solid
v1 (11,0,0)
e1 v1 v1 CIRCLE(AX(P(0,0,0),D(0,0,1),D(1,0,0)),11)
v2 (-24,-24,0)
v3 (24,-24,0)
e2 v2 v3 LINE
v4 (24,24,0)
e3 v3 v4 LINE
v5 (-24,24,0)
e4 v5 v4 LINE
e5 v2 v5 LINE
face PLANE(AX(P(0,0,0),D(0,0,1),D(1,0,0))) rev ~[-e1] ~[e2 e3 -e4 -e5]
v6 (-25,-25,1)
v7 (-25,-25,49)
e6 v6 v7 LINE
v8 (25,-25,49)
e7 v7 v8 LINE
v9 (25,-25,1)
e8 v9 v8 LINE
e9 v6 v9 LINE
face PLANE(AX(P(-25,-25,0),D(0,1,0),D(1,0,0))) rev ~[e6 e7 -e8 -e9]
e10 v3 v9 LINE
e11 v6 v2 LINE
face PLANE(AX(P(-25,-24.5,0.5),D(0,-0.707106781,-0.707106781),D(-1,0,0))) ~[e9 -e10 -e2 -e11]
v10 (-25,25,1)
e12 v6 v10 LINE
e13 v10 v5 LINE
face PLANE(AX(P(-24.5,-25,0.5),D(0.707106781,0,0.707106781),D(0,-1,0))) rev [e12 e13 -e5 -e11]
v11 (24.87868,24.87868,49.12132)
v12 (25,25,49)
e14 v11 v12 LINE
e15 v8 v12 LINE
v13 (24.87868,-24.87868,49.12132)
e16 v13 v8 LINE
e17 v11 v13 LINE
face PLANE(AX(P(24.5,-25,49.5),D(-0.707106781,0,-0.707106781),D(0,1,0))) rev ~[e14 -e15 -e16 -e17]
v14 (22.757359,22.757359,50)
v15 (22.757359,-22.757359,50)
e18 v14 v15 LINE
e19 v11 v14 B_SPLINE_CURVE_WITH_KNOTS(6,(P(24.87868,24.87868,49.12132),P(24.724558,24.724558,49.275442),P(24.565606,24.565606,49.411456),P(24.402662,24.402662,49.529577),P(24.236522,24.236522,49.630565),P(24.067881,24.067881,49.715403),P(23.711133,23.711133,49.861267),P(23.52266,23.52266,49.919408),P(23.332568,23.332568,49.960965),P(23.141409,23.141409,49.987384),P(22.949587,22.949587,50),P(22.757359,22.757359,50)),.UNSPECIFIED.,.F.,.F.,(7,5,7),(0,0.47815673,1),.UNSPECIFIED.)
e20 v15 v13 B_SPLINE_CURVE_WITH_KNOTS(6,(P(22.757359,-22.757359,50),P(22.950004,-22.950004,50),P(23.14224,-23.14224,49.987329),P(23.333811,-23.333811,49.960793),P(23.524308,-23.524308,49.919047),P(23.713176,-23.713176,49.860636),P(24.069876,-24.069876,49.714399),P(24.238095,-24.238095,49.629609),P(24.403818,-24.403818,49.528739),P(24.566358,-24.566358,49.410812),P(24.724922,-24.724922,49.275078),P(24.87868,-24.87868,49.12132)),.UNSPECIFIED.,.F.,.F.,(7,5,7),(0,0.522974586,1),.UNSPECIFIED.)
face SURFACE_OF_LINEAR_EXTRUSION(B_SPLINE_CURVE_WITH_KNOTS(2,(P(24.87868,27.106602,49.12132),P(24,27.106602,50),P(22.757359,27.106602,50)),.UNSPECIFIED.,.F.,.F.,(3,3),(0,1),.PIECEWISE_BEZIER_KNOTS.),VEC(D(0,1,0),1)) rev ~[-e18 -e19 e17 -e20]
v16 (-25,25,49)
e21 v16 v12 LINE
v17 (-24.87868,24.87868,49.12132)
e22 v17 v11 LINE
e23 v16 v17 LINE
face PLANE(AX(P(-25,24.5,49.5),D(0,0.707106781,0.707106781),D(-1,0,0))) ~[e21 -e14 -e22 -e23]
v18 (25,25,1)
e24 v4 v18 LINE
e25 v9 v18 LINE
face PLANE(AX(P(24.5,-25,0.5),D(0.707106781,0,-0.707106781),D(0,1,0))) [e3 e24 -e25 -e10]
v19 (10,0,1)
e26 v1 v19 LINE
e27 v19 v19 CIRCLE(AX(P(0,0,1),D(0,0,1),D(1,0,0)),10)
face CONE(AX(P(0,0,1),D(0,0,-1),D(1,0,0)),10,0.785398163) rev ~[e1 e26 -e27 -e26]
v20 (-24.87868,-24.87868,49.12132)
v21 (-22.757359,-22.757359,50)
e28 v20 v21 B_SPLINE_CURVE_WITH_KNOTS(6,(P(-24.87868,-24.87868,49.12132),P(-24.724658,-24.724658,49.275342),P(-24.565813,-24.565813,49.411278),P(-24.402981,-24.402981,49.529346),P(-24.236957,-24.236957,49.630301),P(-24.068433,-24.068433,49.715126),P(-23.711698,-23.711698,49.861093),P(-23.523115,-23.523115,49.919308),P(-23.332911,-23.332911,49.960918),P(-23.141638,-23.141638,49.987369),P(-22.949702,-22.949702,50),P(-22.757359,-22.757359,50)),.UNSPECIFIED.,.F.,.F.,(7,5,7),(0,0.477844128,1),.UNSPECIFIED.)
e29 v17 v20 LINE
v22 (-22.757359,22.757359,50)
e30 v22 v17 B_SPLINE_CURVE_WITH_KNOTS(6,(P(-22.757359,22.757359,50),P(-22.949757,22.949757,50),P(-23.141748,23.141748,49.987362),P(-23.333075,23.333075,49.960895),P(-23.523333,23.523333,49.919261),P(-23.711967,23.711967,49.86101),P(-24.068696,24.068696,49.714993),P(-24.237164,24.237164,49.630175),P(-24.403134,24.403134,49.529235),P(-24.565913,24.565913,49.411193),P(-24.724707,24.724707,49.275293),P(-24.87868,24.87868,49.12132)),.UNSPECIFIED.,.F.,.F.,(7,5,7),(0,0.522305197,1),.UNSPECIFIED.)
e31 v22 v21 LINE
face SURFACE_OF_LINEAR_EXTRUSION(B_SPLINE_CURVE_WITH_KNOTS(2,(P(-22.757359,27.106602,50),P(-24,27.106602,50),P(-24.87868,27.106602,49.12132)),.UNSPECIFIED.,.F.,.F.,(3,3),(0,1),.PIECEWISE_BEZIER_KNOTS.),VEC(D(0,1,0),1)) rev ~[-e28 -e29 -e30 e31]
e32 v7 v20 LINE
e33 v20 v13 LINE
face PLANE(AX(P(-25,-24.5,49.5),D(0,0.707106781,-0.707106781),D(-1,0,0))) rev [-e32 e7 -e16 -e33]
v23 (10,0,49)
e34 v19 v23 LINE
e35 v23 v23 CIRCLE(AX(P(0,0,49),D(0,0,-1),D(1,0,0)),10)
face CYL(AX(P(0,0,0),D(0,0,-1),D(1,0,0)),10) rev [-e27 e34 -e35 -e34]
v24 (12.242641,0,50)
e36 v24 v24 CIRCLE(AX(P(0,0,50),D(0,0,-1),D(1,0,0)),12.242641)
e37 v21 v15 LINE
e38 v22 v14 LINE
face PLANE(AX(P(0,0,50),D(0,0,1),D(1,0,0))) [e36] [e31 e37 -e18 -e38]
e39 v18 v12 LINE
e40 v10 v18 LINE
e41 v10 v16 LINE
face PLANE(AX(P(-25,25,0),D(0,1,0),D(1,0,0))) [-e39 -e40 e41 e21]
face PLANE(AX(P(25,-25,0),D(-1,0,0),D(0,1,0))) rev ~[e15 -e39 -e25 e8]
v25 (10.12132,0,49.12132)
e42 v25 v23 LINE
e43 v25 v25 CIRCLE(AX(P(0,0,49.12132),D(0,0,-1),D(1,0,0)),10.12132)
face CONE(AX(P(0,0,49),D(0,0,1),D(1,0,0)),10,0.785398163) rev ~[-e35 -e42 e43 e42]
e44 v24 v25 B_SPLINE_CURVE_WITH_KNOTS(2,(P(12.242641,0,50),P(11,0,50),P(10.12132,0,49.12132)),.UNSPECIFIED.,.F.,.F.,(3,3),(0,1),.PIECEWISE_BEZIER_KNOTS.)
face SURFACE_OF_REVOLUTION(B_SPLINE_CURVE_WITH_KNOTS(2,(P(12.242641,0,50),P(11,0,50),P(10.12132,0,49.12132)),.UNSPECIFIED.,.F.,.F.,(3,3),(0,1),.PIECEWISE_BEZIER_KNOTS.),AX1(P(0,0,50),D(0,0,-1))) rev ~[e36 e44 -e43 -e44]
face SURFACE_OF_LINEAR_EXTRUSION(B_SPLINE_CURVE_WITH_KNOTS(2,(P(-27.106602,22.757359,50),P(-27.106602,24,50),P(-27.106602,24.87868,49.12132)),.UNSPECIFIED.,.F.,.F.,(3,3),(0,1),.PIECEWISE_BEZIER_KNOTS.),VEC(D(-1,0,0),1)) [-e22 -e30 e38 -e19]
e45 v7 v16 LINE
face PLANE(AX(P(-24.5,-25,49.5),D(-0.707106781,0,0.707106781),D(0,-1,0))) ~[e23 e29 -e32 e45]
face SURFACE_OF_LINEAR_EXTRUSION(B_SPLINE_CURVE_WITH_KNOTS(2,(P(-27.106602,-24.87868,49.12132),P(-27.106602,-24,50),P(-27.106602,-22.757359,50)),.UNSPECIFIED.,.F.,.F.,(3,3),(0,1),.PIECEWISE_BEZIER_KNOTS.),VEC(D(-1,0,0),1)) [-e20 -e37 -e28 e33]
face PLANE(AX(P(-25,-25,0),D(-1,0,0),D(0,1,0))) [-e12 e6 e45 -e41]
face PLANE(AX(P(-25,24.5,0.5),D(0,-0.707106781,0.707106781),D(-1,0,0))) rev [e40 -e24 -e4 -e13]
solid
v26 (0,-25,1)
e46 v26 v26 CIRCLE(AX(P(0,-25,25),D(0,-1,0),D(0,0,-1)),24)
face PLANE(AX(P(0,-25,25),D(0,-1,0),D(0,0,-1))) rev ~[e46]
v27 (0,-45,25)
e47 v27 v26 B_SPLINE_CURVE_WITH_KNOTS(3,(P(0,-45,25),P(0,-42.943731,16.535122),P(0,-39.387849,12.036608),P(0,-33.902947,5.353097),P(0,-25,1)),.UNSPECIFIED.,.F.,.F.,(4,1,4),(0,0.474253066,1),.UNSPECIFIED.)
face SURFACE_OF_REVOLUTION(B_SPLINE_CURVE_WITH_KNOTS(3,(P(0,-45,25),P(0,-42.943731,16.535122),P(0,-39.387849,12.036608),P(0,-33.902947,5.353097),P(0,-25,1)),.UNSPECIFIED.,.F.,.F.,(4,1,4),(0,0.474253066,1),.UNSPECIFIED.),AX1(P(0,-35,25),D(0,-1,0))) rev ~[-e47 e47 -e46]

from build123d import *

# Parameters (mm, degrees)
F0_W        = 50
F0_H        = 50
F1_DEPTH    = 50
F2_R        = 10
F1_FACE_W   = 50
F1_FACE_H   = 50
F3_DEPTH    = 50.001
F4_SIZE     = 1
F5_T1_DEPTH = 54.2132034356
F5_T3_DEPTH = 54.2132034356


# Not quite as in the source:
# - a fillet or chamfer that OpenCascade refuses, or shapes differently, is made with other operations: its cross-section is extruded or revolved along the edge and cut away or added


with BuildPart() as f1:
    # F0 (on Top) → F1 (new body)
    with BuildSketch(Plane.XY):
        Rectangle(F0_W, F0_H)
    extrude(amount=F1_DEPTH)

    # F2 (on Top) + F1_face (on face) → F3 (cut, through all)
    with BuildSketch(Plane.XY):
        Circle(F2_R)
    with BuildSketch(Plane.XY.offset(50)):
        Rectangle(F1_FACE_W, F1_FACE_H)
    extrude(amount=F3_DEPTH, mode=Mode.SUBTRACT)

    # F4
    f4_edges = [f1.edges().sort_by_distance(p)[0] for p in [
        (25, 0, 0),
        (0, -25, 0),
        (0, 25, 0),
        (-25, 0, 0),
        (-10, 0, 0),
        (25, 0, 50),
        (0, -25, 50),
        (0, 25, 50),
        (-25, 0, 50),
        (-10, 0, 50),
    ]]
    chamfer(f4_edges, length=F4_SIZE)

    # F5: fillet of radius 3 on 5 edges, made by hand

    # F5_s2 → F5_t1 (cut)
    with BuildSketch(Plane.XZ.offset(-27.1066017178)):
        with BuildLine():
            add(Edge.make_bspline(
                [(24.8786796564, 49.1213203436), (24, 50), (22.7573593129, 50)],
                knots=[0, 0, 0, 1, 1, 1], degree=2, weights=[1, 1, 1]))
            Line((22.7573593129, 50), (24, 50))
            Line((24, 50), (24.8786796564, 49.1213203436))
        make_face()
        with BuildLine():
            add(Edge.make_bspline(
                [(-22.7573593129, 50), (-24, 50), (-24.8786796564, 49.1213203436)],
                knots=[0, 0, 0, 1, 1, 1], degree=2, weights=[1, 1, 1]))
            Line((-24.8786796564, 49.1213203436), (-24, 50))
            Line((-24, 50), (-22.7573593129, 50))
        make_face()
    extrude(amount=F5_T1_DEPTH, mode=Mode.SUBTRACT)

    # F5_s4 → F5_t3 (cut)
    with BuildSketch(Plane.YZ.offset(-27.1066017178)):
        with BuildLine():
            add(Edge.make_bspline(
                [(-24.8786796564, 49.1213203436), (-24, 50), (-22.7573593129, 50)],
                knots=[0, 0, 0, 1, 1, 1], degree=2, weights=[1, 1, 1]))
            Line((-22.7573593129, 50), (-24, 50))
            Line((-24, 50), (-24.8786796564, 49.1213203436))
        make_face()
        with BuildLine():
            add(Edge.make_bspline(
                [(22.7573593129, 50), (24, 50), (24.8786796564, 49.1213203436)],
                knots=[0, 0, 0, 1, 1, 1], degree=2, weights=[1, 1, 1]))
            Line((24.8786796564, 49.1213203436), (24, 50))
            Line((24, 50), (22.7573593129, 50))
        make_face()
    extrude(amount=F5_T3_DEPTH, mode=Mode.SUBTRACT)

    # F5_s5 → F5_t6 (revolve, cut)
    with BuildSketch(Plane.XZ):
        with BuildLine():
            add(Edge.make_bspline(
                [(12.2426406871, 50), (11, 50), (10.1213203436, 49.1213203436)],
                knots=[0, 0, 0, 1, 1, 1], degree=2, weights=[1, 1, 1]))
            Line((10.1213203436, 49.1213203436), (11, 50))
            Line((11, 50), (12.2426406871, 50))
        make_face()
    revolve(axis=Axis((0, 0, 50), (0, 0, -1)), mode=Mode.SUBTRACT)


with BuildPart() as f7:
    # F6 (on Right) → F7 (revolve)
    with BuildSketch(Plane.YZ):
        with BuildLine():
            Line((-25, 1), (-25, 25))
            Line((-25, 25), (-45, 25))
            add(Edge.make_bspline(
                [(-45, 25), (-42.9437309504, 16.5351219475), (-39.3878491982, 12.0366081686), (-33.9029468596, 5.3530973382), (-25, 1)],
                knots=[0, 0, 0, 0, 0.4742530664, 1, 1, 1, 1], degree=3))
        make_face()
    revolve(axis=Axis((0, -35, 25), (0, -1, 0)))


solid = Compound([f1.part, f7.part])
